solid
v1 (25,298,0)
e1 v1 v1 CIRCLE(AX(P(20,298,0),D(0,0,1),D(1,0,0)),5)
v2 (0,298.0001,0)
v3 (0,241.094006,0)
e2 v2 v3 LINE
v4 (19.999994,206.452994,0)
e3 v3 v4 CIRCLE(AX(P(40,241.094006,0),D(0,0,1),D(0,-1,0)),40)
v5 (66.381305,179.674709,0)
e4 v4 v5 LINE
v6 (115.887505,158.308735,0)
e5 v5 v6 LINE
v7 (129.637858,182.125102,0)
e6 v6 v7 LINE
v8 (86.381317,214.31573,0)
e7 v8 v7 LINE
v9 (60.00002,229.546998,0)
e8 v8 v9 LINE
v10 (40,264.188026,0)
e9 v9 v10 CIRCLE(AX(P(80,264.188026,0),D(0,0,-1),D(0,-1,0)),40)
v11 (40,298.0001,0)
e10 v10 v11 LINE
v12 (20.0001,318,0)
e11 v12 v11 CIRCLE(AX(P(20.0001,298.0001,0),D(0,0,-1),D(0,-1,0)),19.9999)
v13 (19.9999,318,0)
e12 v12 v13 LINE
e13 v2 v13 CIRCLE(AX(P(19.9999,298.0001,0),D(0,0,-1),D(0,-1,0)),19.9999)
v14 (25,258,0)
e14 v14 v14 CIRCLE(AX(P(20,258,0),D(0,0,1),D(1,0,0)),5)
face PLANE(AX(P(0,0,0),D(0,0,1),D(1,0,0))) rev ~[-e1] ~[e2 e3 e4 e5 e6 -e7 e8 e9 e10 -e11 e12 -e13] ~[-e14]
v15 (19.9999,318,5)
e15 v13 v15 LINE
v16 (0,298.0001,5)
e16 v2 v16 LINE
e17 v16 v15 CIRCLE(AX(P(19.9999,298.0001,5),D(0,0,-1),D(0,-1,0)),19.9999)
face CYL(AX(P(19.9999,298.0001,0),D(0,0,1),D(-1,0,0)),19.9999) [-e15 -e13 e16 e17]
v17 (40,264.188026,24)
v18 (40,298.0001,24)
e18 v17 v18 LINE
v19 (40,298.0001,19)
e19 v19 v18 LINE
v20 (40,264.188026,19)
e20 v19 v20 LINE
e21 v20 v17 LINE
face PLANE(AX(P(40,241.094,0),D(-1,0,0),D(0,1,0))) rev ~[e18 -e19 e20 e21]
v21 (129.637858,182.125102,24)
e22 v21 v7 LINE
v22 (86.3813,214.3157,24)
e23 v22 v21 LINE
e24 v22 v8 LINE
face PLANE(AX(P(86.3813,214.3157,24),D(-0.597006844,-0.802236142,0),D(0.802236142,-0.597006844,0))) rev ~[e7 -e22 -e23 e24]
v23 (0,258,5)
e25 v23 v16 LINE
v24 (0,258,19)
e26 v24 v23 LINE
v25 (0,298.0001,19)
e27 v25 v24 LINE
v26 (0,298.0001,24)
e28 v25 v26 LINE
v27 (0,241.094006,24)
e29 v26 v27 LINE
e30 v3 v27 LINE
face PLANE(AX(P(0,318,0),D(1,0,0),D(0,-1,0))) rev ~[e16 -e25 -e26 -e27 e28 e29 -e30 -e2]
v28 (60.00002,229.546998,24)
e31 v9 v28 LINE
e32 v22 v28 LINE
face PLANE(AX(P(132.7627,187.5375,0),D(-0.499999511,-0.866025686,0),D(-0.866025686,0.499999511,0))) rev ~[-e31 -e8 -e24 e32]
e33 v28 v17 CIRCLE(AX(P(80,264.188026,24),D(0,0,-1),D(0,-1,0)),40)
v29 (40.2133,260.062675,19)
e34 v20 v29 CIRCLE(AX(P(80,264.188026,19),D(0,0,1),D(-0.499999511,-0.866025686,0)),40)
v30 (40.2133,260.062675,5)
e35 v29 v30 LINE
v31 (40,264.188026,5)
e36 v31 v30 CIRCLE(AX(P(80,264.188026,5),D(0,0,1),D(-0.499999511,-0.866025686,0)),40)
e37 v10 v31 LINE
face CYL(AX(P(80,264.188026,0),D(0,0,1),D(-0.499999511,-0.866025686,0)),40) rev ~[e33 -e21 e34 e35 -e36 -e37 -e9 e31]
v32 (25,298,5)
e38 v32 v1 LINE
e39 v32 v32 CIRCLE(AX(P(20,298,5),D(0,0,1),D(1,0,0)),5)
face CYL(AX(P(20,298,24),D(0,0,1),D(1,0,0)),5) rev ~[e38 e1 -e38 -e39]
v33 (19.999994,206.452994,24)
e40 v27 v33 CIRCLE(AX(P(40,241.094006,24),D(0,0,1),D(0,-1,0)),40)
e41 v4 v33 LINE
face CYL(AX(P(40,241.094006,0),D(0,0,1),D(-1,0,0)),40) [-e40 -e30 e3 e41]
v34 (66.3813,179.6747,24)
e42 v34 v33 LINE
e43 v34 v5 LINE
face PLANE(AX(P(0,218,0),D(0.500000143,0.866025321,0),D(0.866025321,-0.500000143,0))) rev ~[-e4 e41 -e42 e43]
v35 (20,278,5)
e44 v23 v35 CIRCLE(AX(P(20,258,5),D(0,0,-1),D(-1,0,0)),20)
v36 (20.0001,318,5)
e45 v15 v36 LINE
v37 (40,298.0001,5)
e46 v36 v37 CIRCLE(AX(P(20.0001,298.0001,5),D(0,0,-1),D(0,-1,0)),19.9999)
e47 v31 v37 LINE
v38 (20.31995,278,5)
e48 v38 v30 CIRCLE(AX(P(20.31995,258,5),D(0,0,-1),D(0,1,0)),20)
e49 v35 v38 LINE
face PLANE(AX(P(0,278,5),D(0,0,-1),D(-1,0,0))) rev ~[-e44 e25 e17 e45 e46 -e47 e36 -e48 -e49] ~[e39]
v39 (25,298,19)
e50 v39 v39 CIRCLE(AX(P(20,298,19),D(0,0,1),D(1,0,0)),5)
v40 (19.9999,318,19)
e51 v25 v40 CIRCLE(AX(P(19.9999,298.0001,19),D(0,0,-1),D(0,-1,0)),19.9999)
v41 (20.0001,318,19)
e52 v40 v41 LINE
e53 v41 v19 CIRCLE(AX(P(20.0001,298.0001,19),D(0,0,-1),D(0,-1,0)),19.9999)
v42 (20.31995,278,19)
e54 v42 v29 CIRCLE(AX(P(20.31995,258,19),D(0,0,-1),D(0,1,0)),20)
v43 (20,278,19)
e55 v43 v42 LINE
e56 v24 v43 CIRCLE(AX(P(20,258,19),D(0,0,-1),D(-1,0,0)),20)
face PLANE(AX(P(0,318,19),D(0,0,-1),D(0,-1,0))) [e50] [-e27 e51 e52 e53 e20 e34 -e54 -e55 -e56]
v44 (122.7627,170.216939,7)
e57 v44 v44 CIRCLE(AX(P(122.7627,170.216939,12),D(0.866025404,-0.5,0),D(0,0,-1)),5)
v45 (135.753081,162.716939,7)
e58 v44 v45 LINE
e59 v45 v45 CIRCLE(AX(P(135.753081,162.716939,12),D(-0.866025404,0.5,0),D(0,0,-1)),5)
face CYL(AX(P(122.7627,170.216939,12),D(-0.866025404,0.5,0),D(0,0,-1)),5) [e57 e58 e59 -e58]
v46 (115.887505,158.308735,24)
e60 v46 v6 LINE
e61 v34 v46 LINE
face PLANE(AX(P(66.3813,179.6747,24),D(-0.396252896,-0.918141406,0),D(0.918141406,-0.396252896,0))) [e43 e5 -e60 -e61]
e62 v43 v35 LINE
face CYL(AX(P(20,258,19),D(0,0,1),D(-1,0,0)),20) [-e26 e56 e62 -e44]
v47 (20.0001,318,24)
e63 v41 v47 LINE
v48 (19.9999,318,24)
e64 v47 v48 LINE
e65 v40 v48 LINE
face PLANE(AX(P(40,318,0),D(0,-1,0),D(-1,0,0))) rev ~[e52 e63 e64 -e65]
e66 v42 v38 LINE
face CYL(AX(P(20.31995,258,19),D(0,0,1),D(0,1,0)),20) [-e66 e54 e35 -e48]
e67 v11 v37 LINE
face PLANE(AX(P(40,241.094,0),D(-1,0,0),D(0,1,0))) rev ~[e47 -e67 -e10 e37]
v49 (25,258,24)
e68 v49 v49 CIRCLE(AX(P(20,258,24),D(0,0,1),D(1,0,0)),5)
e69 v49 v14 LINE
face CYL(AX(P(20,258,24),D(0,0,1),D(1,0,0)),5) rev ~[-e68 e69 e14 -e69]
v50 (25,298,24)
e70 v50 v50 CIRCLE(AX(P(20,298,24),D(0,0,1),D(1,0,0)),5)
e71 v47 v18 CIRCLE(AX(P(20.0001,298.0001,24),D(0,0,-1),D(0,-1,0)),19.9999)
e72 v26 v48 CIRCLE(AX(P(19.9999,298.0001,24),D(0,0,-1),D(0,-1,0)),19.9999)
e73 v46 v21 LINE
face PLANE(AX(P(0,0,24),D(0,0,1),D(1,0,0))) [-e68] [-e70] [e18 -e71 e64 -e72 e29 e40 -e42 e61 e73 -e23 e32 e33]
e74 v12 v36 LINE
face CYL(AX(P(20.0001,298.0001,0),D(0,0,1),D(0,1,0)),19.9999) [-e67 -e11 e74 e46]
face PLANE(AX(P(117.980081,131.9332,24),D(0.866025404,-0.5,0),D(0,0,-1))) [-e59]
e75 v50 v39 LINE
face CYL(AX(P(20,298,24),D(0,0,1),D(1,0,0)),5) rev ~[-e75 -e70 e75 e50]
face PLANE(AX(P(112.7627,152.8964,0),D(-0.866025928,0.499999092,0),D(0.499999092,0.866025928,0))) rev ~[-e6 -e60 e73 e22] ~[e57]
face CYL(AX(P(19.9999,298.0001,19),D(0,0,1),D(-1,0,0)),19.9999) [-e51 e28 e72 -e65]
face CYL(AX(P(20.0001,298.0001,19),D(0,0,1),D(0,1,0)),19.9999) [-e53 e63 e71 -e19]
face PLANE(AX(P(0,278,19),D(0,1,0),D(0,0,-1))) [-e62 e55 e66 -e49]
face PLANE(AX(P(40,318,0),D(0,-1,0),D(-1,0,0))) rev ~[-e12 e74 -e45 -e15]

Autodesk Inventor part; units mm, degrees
ref_plane "YZ Plane" through (0, 0, 0) normal (1, 0, 0) x (0, 1, 0)
ref_plane "XZ Plane" through (0, 0, 0) normal (0, 1, 0) x (-1, 0, 0)
ref_plane "XY Plane" through (0, 0, 0) normal (0, 0, 1) x (1, 0, 0)
sketch "スケッチ1" plane through (0, 0, 0) normal (0, 0, 1) x (1, 0, 0)
  line L0 (0, 0) -> (40, 0)
  line L1 (40, 0) -> (40, 318)
  line L2 (40, 318) -> (0, 318)
  line L3 (0, 318) -> (0, 0)
  line L4 (0, 218) -> (112.7627, 152.8964)
  line L5 (112.7627, 152.8964) -> (132.7627, 187.5375)
  line L6 (132.7627, 187.5375) -> (40, 241.094)
  point P0 (40, 218)
  point P1 (40, 194.906)
  point P2 (20, 318)
  point P3 (122.7627, 170.2169)
  dimension "d0" = 40
  dimension "d1" = 318
  dimension "d69" = 40
  dimension "d70" = 60
  dimension "d91" = 20
  dimension "d92" = 100
  dimension "d93" = 180
extrude "押し出し1" add sketch "スケッチ1" along normal blind 24 contours L3 L2 L1 L4 | L1 L6 L5 L4
sketch "スケッチ6" plane through (0, 0, 24) normal (0, 0, 1) x (1, 0, 0)
  circle A0 centre (20, 258) radius 5
  line L0 (40, 318) -> (0, 318) projected
  line L1 (40, 241.094) -> (40, 318) projected
  circle A1 centre (20, 20) radius 1.2295
  circle A2 centre (20, 10) radius 1.2295
  line L2 (0, 0) -> (40, 0) projected
  circle A3 centre (20, 298) radius 5
  point P0 (20, 318)
  point P1 (40, 190.8114)
  point P2 (30, 0)
  dimension "d42" = 10
  dimension "d44" = 20
  dimension "d45" = 2.459
  dimension "d46" = 2.459
  dimension "d47" = 10
  dimension "d48" = 10
  dimension "d49" = 20
  dimension "d50" = 20
  dimension "d53" = 10
  dimension "d54" = 20
  dimension "d55" = 40
  dimension "d56" = 20
extrude "押し出し4" cut sketch "スケッチ6" against normal through all
sketch "スケッチ8" plane through (0, 0, 0) normal (-1, 0, 0) x (0, 0, 1)
  line L0 (0, 318) -> (24, 318) projected
  line L1 (5, 318) -> (19, 318)
  line L2 (19, 318) -> (19, 278)
  line L3 (19, 278) -> (5, 278)
  line L4 (5, 278) -> (5, 318)
  line L5 (0, 318) -> (0, 0) projected
  dimension "d57" = 5
  dimension "d58" = 14
  dimension "d59" = 40
extrude "押し出し5" cut sketch "スケッチ8" against normal through all
fillet "フィレット1" radius 20 4 edges at (40, 318, 21.5) (40, 318, 2.5) (0, 318, 2.5) (0, 318, 21.5)
fillet "フィレット2" radius 40 2 edges at (0, 218, 12) (40, 241.094, 12)
sketch "スケッチ9" plane through (0, 0, 24) normal (0, 0, 1) x (1, 0, 0)
  line L0 (20, 206.453) -> (112.7627, 152.8964) projected
  line L1 (132.7627, 187.5375) -> (60, 229.547) projected
  line L2 (112.7627, 152.8964) -> (132.7627, 187.5375) projected
  line L3 (132.7627, 187.5375) -> (112.7627, 152.8964)
  line L4 (66.3813, 179.6747) -> (112.7627, 152.8964)
  line L5 (132.7627, 187.5375) -> (166.773, 167.9016)
  line L6 (115.1204, 126.9801) -> (133.5174, 158.8446)
  line L7 (141.7531, 173.1092) -> (128.7627, 180.6092)
  line L8 (112.7627, 152.8964) -> (20, 206.453)
  line L9 (132.7627, 187.5375) -> (60, 229.547)
  line L10 (115.1204, 126.9801) -> (125.7531, 145.3964)
  line L11 (133.5174, 158.8446) -> (145.7531, 180.0375)
  line L12 (116.7627, 159.8246) -> (129.7531, 152.3246)
  line L13 (66.3813, 179.6747) -> (129.7531, 152.3246)
  line L14 (66.3813, 179.6747) -> (86.3813, 214.3157)
  line L15 (86.3813, 214.3157) -> (141.7531, 173.1092)
  point P0 (0, 0)
  point P1 (254.4532, 80.329)
  point P2 (128.7627, 180.6092)
  point P3 (123.2579, 156.0746)
  point P4 (86.3813, 214.3157)
  point P5 (40, 194.906)
  point P6 (115.8875, 158.3088)
  point P7 (129.6379, 182.1251)
  dimension "d80" = 24
  dimension "d81" = 40
  dimension "d83" = 15
  dimension "d84" = 8
  dimension "d90" = 24
extrude "押し出し6" cut sketch "スケッチ9" against normal through all contours L13 L2 L0 | L1 L2 L15
sketch "スケッチ11" plane through (104.9897, 139.4332, 24) normal (0.8660254, -0.5, 0) x (0, 0, -1)
  line L0 (0, 21.7957) -> (0, 49.2964) projected
  line L1 (24, 21.7957) -> (24, 49.2964) projected
  line L2 (0, 24) -> (24, 24)
  line L3 (24, 24) -> (24, 0)
  line L4 (24, 0) -> (0, 0)
  line L5 (0, 0) -> (0, 24)
  line L6 (17, 17) -> (7, 17)
  line L7 (7, 17) -> (7, 7)
  line L8 (7, 7) -> (17, 7)
  line L9 (17, 7) -> (17, 17)
  line L10 (0, 35.546) -> (24, 35.546) projected
  circle A0 centre (12, 35.546) radius 5
  point P0 (24, -173.2475)
  point P1 (24, 24)
  point P2 (0, 15.546)
  point P3 (0, 55.546)
  point P4 (24, 15.546)
  point P5 (24, 55.546)
  dimension "d85" = 10
  dimension "d88" = 10
extrude "押し出し7" add sketch "スケッチ11" along normal blind 15 contours A0 L10 | L10 A0
fillet "フィレット4" radius 20 2 edges at (0, 278, 12) (40, 278, 12)
equation "\"d45\" = d46"
equation "\"d48\" = d47"
equation "\"d50\" = d49"
properties part number "l_r_k2a__legparts_06(six)"
